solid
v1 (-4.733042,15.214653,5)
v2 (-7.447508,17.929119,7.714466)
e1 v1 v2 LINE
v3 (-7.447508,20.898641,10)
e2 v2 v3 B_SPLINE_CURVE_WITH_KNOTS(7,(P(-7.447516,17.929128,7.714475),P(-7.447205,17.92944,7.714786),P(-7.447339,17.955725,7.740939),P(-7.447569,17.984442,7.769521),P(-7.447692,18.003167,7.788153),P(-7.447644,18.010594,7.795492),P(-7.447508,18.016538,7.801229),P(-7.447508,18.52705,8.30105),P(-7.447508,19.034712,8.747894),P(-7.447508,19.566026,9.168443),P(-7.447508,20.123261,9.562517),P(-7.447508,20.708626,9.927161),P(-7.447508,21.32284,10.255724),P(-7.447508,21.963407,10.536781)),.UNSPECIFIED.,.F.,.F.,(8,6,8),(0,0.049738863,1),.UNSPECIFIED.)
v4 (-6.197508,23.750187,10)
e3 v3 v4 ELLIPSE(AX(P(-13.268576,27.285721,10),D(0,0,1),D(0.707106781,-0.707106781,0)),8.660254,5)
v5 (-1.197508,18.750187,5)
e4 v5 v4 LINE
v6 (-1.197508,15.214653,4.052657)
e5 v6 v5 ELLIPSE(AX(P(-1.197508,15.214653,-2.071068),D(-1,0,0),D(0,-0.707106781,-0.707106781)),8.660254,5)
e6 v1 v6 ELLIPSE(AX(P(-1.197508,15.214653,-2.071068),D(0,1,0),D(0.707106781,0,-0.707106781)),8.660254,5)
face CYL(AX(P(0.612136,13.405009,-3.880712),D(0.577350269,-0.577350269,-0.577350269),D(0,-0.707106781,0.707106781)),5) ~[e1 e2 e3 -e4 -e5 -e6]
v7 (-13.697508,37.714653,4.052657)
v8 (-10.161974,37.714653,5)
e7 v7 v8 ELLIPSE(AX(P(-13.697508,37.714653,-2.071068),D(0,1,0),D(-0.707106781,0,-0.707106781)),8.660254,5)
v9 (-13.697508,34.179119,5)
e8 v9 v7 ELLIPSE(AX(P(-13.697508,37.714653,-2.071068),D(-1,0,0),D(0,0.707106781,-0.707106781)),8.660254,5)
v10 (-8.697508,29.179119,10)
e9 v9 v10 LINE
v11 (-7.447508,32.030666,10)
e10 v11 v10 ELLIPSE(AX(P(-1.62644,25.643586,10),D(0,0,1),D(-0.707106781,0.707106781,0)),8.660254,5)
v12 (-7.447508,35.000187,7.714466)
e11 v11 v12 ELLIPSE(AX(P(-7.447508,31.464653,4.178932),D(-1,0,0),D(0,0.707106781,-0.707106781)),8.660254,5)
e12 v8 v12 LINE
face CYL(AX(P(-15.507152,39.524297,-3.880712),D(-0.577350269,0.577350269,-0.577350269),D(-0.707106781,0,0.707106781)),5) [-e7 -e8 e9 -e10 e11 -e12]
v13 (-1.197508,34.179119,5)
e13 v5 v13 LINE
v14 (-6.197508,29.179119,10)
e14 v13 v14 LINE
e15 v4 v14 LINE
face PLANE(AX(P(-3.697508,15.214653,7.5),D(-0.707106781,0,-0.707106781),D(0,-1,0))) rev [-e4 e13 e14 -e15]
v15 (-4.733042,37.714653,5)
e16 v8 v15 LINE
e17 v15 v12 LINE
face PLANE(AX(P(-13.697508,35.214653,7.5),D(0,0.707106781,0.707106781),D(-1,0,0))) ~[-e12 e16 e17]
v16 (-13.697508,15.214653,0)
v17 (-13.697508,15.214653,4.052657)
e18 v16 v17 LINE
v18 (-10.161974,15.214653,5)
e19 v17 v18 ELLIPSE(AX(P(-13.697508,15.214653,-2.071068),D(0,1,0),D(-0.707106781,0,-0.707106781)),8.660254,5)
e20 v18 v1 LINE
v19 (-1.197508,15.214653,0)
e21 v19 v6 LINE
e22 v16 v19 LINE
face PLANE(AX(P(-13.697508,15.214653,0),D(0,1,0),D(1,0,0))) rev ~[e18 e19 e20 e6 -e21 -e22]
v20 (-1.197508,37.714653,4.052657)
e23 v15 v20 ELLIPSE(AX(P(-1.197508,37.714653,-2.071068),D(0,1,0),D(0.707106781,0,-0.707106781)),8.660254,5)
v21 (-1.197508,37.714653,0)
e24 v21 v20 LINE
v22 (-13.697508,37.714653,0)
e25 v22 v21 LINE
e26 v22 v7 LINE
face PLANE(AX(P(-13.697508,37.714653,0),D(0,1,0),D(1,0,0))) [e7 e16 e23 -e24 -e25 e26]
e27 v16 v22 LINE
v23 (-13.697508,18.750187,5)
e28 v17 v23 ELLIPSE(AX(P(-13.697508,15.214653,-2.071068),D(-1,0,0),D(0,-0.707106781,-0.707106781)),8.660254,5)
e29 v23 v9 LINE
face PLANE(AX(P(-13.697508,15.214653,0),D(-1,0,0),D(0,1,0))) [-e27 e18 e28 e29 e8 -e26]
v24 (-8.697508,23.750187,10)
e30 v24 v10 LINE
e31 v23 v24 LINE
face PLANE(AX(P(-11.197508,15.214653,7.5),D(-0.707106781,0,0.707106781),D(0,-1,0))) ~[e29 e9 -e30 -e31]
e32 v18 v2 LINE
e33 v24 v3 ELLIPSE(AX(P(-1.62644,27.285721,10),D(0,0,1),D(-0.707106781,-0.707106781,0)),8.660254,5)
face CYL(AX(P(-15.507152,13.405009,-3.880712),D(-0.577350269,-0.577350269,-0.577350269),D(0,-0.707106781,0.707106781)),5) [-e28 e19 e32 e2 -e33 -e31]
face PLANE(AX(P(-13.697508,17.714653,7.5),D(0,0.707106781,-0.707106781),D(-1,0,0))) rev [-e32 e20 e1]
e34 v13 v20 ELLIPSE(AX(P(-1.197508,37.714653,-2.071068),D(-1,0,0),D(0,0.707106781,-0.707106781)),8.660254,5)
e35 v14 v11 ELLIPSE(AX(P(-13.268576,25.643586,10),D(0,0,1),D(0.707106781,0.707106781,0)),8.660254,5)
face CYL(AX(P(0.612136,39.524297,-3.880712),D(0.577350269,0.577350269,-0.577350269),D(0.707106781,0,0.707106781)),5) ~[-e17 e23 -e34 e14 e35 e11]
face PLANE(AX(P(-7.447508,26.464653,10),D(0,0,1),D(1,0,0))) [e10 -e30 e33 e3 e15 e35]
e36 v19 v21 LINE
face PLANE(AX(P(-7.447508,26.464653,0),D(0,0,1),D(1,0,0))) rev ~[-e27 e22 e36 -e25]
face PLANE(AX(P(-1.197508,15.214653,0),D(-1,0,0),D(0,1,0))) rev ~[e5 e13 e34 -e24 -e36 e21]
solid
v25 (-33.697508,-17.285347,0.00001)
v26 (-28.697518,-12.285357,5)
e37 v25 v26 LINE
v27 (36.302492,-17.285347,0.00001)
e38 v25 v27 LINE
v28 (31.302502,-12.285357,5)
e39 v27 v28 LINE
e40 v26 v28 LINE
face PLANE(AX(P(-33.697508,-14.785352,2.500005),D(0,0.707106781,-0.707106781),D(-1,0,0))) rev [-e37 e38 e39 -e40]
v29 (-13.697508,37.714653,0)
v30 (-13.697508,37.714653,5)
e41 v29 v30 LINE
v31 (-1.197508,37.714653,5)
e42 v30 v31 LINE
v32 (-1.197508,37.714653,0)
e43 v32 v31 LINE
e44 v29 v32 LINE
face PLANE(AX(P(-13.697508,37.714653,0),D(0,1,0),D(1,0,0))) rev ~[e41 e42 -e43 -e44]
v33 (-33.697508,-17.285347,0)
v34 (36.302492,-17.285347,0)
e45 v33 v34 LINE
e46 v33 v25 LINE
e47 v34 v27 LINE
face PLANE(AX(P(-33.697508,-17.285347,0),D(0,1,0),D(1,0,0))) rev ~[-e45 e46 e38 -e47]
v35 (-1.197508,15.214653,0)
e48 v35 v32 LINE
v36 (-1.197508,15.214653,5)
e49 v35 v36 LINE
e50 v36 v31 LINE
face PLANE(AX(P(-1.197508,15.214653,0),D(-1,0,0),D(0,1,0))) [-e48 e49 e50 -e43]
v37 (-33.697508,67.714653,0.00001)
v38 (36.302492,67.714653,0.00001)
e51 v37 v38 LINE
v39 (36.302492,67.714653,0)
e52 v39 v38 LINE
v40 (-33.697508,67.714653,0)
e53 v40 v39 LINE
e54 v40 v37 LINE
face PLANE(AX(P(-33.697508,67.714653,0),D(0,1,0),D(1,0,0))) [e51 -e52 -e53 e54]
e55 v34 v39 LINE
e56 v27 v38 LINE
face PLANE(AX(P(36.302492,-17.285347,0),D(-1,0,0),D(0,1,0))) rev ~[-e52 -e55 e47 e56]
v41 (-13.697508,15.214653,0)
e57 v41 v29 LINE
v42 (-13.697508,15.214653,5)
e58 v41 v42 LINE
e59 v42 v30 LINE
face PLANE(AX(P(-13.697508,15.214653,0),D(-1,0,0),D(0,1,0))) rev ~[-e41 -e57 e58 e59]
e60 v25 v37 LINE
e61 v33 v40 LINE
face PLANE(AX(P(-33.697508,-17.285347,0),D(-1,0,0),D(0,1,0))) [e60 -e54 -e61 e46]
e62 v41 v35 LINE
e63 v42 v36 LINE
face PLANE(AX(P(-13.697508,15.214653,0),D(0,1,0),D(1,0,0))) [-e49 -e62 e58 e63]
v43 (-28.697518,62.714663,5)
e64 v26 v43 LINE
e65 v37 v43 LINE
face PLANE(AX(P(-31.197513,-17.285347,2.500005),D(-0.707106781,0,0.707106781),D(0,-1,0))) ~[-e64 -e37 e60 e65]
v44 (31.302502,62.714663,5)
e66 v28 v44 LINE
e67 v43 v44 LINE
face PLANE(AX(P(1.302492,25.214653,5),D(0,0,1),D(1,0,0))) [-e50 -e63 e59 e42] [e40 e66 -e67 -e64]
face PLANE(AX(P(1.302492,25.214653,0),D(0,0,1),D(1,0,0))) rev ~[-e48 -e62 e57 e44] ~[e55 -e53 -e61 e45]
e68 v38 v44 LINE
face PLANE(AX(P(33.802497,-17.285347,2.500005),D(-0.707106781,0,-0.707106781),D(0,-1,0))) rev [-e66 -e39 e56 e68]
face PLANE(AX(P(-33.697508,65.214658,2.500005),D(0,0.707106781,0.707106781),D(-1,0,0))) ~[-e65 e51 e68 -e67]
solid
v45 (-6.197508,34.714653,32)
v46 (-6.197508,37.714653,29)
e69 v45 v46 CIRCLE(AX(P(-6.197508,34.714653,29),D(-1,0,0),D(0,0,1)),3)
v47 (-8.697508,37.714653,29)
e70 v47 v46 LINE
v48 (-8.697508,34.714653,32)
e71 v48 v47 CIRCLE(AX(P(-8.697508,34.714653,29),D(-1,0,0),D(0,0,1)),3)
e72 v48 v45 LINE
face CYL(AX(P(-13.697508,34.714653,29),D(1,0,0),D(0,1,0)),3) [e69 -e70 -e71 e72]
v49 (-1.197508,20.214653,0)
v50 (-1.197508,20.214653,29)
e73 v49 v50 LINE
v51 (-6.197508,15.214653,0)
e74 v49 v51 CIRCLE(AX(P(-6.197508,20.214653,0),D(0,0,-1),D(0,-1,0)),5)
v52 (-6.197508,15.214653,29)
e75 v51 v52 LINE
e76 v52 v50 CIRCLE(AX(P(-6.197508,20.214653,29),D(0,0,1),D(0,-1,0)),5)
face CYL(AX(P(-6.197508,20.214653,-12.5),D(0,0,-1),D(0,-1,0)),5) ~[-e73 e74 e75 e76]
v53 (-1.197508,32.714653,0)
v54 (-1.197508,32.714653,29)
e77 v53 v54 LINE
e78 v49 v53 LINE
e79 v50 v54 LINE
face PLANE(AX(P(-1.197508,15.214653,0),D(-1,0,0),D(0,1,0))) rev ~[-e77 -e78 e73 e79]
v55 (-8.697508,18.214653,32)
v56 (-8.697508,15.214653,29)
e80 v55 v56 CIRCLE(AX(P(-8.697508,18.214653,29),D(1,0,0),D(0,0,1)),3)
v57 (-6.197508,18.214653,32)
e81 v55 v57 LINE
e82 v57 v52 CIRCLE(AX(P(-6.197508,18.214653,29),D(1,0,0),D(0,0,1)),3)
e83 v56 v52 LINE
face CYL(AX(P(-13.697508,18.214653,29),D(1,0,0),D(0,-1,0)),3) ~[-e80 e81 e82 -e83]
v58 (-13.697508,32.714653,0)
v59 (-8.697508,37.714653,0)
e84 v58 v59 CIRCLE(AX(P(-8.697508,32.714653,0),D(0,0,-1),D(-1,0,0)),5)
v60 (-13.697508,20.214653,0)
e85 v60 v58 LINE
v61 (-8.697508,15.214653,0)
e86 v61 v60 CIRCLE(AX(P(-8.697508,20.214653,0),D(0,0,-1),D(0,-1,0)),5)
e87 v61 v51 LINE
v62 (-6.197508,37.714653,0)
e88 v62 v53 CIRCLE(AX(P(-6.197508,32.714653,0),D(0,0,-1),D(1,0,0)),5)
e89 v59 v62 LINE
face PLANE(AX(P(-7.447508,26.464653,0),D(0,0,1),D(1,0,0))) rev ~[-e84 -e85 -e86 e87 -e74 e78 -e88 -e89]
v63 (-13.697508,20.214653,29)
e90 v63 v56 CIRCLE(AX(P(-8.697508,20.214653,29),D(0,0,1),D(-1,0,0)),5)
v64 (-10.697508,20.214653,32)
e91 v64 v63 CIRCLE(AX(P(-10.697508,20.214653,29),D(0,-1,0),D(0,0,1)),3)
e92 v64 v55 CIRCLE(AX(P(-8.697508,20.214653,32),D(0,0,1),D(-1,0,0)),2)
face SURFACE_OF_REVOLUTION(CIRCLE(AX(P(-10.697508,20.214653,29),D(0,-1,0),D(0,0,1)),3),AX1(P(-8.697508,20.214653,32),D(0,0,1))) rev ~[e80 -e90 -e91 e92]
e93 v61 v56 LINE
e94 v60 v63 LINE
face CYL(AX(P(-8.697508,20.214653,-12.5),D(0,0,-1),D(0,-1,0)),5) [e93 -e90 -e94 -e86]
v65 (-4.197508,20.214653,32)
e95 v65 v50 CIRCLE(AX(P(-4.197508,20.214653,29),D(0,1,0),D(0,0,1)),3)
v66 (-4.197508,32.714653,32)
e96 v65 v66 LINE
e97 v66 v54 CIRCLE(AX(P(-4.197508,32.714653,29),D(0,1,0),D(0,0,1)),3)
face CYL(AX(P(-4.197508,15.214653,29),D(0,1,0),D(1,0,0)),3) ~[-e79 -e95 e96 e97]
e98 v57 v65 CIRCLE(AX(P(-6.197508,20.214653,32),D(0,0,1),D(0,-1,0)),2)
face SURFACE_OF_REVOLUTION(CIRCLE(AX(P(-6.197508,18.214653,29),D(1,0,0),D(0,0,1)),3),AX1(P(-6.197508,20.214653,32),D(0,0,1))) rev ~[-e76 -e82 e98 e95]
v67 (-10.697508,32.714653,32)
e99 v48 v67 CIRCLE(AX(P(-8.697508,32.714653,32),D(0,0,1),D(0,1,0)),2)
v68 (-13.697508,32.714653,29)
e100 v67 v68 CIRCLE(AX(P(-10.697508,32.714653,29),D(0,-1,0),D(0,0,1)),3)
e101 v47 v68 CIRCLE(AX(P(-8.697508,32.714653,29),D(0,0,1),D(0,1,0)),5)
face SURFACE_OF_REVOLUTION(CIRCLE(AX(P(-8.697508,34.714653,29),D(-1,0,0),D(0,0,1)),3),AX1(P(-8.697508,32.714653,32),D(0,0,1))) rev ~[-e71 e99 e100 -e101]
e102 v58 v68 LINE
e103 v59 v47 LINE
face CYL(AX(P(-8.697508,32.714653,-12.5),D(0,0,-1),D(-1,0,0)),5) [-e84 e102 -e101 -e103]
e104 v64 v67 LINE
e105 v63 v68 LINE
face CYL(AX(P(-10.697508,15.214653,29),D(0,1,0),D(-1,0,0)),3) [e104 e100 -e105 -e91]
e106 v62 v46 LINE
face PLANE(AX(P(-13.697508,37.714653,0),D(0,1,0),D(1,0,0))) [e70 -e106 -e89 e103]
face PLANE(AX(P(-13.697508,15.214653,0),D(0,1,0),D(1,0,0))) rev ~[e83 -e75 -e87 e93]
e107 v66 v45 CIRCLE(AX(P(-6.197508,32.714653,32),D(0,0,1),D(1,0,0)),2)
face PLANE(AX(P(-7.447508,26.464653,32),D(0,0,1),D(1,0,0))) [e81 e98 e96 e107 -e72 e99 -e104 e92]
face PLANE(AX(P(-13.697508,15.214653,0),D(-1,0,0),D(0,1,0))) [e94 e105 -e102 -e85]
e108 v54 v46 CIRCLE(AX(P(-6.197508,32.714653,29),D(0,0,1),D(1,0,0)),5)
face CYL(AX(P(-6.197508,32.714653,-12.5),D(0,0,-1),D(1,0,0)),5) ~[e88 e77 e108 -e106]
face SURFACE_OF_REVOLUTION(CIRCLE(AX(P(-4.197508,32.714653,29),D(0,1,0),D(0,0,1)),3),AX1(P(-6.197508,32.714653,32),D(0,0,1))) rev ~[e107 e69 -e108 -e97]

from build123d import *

# Parameters (mm, degrees)
F0_W         = 70
F0_H         = 85
F0_W_2       = 12.5
F0_H_2       = 22.5
F1_DEPTH     = 5
F2_SIZE      = 4.99999
F3_DEPTH     = 32
F4_R         = 3
F5_T1_DEPTH  = 44.5
F5_T4_ANGLE  = 90
F5_T6_ANGLE  = 90
F5_T8_ANGLE  = 90
F5_T10_ANGLE = 90
F6_DEPTH     = 10
F7_SIZE      = 5
F8_T1_DEPTH  = 23.0940107676
F8_T3_DEPTH  = 23.0940107676
F8_T5_DEPTH  = 23.0940107676
F8_T7_DEPTH  = 23.0940107676


# Not quite as in the source:
# - a fillet or chamfer that OpenCascade refuses, or shapes differently, is made with other operations: its cross-section is extruded or revolved along the edge and cut away or added
# - a fillet or chamfer is up to 0.001 mm smaller than in the source, because OpenCascade refuses the exact size


with BuildPart() as f1:
    # F0 (on Top) → F1 (new body)
    with BuildSketch(Plane.XY):
        with Locations((1.3024921715, 25.2146533675)):
            Rectangle(F0_W, F0_H)
        with Locations((-7.4475078285, 26.4646533675)):
            Rectangle(F0_W_2, F0_H_2, mode=Mode.SUBTRACT)
    extrude(amount=F1_DEPTH)

    # F2 (size 5 in the source; OpenCascade refuses exactly that, so slightly less here)
    f2_edges = [f1.edges().sort_by_distance(p)[0] for p in [
        (-33.697508, 25.214653, 5),
        (1.302492, -17.285347, 5),
        (36.302492, 25.214653, 5),
        (1.302492, 67.714653, 5),
    ]]
    chamfer(f2_edges, length=F2_SIZE)


with BuildPart() as f3:
    # F0 (on Top) → F3 (new body)
    with BuildSketch(Plane.XY):
        with Locations((-7.4475078285, 26.4646533675)):
            Rectangle(F0_W_2, F0_H_2)
    extrude(amount=F3_DEPTH)

    # F4
    f4_edges = [f3.edges().sort_by_distance(p)[0] for p in [
        (-13.697508, 26.464653, 32),
        (-7.447508, 15.214653, 32),
        (-7.447508, 37.714653, 32),
        (-1.197508, 26.464653, 32),
    ]]
    fillet(f4_edges, radius=F4_R)

    # F5: fillet of radius 5 on 8 edges, made by hand

    # F5_s2 → F5_t1 (cut)
    with BuildSketch(Plane.XY.offset(-12.5)):
        with BuildLine():
            ThreePointArc((-1.1975078285, 32.7146533675), (-2.6619739225, 36.2501872734), (-6.1975078285, 37.7146533675))
            Line((-6.1975078285, 37.7146533675), (-1.1975078285, 37.7146533675))
            Line((-1.1975078285, 37.7146533675), (-1.1975078285, 32.7146533675))
        make_face()
        with BuildLine():
            ThreePointArc((-6.1975078285, 15.2146533675), (-2.6619739225, 16.6791194616), (-1.1975078285, 20.2146533675))
            Line((-1.1975078285, 20.2146533675), (-1.1975078285, 15.2146533675))
            Line((-1.1975078285, 15.2146533675), (-6.1975078285, 15.2146533675))
        make_face()
        with BuildLine():
            ThreePointArc((-8.6975078285, 15.2146533675), (-12.2330417344, 16.6791194616), (-13.6975078285, 20.2146533675))
            Line((-13.6975078285, 20.2146533675), (-13.6975078285, 15.2146533675))
            Line((-13.6975078285, 15.2146533675), (-8.6975078285, 15.2146533675))
        make_face()
        with BuildLine():
            ThreePointArc((-13.6975078285, 32.7146533675), (-12.2330417344, 36.2501872734), (-8.6975078285, 37.7146533675))
            Line((-8.6975078285, 37.7146533675), (-13.6975078285, 37.7146533675))
            Line((-13.6975078285, 37.7146533675), (-13.6975078285, 32.7146533675))
        make_face()
    extrude(amount=F5_T1_DEPTH, mode=Mode.SUBTRACT)

    # F5_s3 → F5_t4 (revolve, cut)
    with BuildSketch(Plane.YZ.offset(-8.6975078285)):
        with BuildLine():
            ThreePointArc((34.7146533675, 32), (36.8359737111, 31.1213203436), (37.7146533675, 29))
            Line((37.7146533675, 29), (37.7146533675, 32))
            Line((37.7146533675, 32), (34.7146533675, 32))
        make_face()
    revolve(axis=Axis((-8.6975078285, 32.7146533675, 32), (0, 0, 1)), revolution_arc=F5_T4_ANGLE, mode=Mode.SUBTRACT)

    # F5_s5 → F5_t6 (revolve, cut)
    with BuildSketch(Plane.XZ.offset(-20.2146533675)):
        with BuildLine():
            ThreePointArc((-10.6975078285, 32), (-12.818828172, 31.1213203436), (-13.6975078285, 29))
            Line((-13.6975078285, 29), (-13.6975078285, 32))
            Line((-13.6975078285, 32), (-10.6975078285, 32))
        make_face()
    revolve(axis=Axis((-8.6975078285, 20.2146533675, 32), (0, 0, 1)), revolution_arc=F5_T6_ANGLE, mode=Mode.SUBTRACT)

    # F5_s7 → F5_t8 (revolve, cut)
    with BuildSketch(Plane.YZ.offset(-6.1975078285)):
        with BuildLine():
            ThreePointArc((18.2146533675, 32), (16.0933330239, 31.1213203436), (15.2146533675, 29))
            Line((15.2146533675, 29), (15.2146533675, 32))
            Line((15.2146533675, 32), (18.2146533675, 32))
        make_face()
    revolve(axis=Axis((-6.1975078285, 20.2146533675, 32), (0, 0, 1)), revolution_arc=F5_T8_ANGLE, mode=Mode.SUBTRACT)

    # F5_s9 → F5_t10 (revolve, cut)
    with BuildSketch(Plane.XZ.offset(-32.7146533675)):
        with BuildLine():
            ThreePointArc((-4.1975078285, 32), (-2.0761874849, 31.1213203436), (-1.1975078285, 29))
            Line((-1.1975078285, 29), (-1.1975078285, 32))
            Line((-1.1975078285, 32), (-4.1975078285, 32))
        make_face()
    revolve(axis=Axis((-6.1975078285, 32.7146533675, 32), (0, 0, 1)), revolution_arc=F5_T10_ANGLE, mode=Mode.SUBTRACT)


with BuildPart() as f6:
    # F0 (on Top) → F6 (new body)
    with BuildSketch(Plane.XY):
        with Locations((-7.4475078285, 26.4646533675)):
            Rectangle(F0_W_2, F0_H_2)
    extrude(amount=F6_DEPTH)

    # F7
    f7_edges = [f6.edges().sort_by_distance(p)[0] for p in [
        (-13.697508, 26.464653, 10),
        (-7.447508, 15.214653, 10),
        (-1.197508, 26.464653, 10),
        (-7.447508, 37.714653, 10),
    ]]
    chamfer(f7_edges, length=F7_SIZE)

    # F8: fillet of radius 5 on 4 edges, made by hand

    # F8_s2 → F8_t1 (cut)
    with BuildSketch(Plane(origin=(-19.6373870653, 19.6373870653, -19.6373870653), x_dir=(0.7071067812, 0.7071067812, 0), z_dir=(0.5773502692, -0.5773502692, 0.5773502692))):
        with BuildLine():
            ThreePointArc((14.4826864754, 23.628034149), (16.9826864754, 24.2979071301), (19.4826864754, 23.628034149))
            Line((19.4826864754, 23.628034149), (16.9826864754, 25.0714098219))
            Line((16.9826864754, 25.0714098219), (14.4826864754, 23.628034149))
        make_face()
    extrude(amount=F8_T1_DEPTH, mode=Mode.SUBTRACT)

    # F8_s4 → F8_t3 (cut)
    with BuildSketch(Plane(origin=(14.6723818463, 14.6723818463, -14.6723818463), x_dir=(0.7071067812, -0.7071067812, 0), z_dir=(-0.5773502692, -0.5773502692, 0.5773502692))):
        with BuildLine():
            ThreePointArc((-25.0150530523, 17.5471694706), (-27.5150530523, 18.2170424517), (-30.0150530523, 17.5471694706))
            Line((-30.0150530523, 17.5471694706), (-27.5150530523, 18.9905451436))
            Line((-27.5150530523, 18.9905451436), (-25.0150530523, 17.5471694706))
        make_face()
    extrude(amount=F8_T3_DEPTH, mode=Mode.SUBTRACT)

    # F8_s6 → F8_t5 (cut)
    with BuildSketch(Plane(origin=(-1.9942848203, -1.9942848203, -1.9942848203), x_dir=(-0.7071067812, 0.7071067812, 0), z_dir=(0.5773502692, 0.5773502692, 0.5773502692))):
        with BuildLine():
            ThreePointArc((17.9439852404, 2.019735159), (20.4439852404, 2.68960814), (22.9439852404, 2.019735159))
            Line((22.9439852404, 2.019735159), (20.4439852404, 3.4631108319))
            Line((20.4439852404, 3.4631108319), (17.9439852404, 2.019735159))
        make_face()
    extrude(amount=F8_T5_DEPTH, mode=Mode.SUBTRACT)

    # F8_s8 → F8_t7 (cut)
    with BuildSketch(Plane(origin=(-2.9707203987, 2.9707203987, 2.9707203987), x_dir=(-0.7071067812, -0.7071067812, 0), z_dir=(-0.5773502692, 0.5773502692, 0.5773502692))):
        with BuildLine():
            ThreePointArc((-7.4116186635, -4.0611295194), (-9.9116186635, -3.3912565383), (-12.4116186635, -4.0611295194))
            Line((-12.4116186635, -4.0611295194), (-9.9116186635, -2.6177538464))
            Line((-9.9116186635, -2.6177538464), (-7.4116186635, -4.0611295194))
        make_face()
    extrude(amount=F8_T7_DEPTH, mode=Mode.SUBTRACT)


solid = Compound([f1.part, f3.part, f6.part])
